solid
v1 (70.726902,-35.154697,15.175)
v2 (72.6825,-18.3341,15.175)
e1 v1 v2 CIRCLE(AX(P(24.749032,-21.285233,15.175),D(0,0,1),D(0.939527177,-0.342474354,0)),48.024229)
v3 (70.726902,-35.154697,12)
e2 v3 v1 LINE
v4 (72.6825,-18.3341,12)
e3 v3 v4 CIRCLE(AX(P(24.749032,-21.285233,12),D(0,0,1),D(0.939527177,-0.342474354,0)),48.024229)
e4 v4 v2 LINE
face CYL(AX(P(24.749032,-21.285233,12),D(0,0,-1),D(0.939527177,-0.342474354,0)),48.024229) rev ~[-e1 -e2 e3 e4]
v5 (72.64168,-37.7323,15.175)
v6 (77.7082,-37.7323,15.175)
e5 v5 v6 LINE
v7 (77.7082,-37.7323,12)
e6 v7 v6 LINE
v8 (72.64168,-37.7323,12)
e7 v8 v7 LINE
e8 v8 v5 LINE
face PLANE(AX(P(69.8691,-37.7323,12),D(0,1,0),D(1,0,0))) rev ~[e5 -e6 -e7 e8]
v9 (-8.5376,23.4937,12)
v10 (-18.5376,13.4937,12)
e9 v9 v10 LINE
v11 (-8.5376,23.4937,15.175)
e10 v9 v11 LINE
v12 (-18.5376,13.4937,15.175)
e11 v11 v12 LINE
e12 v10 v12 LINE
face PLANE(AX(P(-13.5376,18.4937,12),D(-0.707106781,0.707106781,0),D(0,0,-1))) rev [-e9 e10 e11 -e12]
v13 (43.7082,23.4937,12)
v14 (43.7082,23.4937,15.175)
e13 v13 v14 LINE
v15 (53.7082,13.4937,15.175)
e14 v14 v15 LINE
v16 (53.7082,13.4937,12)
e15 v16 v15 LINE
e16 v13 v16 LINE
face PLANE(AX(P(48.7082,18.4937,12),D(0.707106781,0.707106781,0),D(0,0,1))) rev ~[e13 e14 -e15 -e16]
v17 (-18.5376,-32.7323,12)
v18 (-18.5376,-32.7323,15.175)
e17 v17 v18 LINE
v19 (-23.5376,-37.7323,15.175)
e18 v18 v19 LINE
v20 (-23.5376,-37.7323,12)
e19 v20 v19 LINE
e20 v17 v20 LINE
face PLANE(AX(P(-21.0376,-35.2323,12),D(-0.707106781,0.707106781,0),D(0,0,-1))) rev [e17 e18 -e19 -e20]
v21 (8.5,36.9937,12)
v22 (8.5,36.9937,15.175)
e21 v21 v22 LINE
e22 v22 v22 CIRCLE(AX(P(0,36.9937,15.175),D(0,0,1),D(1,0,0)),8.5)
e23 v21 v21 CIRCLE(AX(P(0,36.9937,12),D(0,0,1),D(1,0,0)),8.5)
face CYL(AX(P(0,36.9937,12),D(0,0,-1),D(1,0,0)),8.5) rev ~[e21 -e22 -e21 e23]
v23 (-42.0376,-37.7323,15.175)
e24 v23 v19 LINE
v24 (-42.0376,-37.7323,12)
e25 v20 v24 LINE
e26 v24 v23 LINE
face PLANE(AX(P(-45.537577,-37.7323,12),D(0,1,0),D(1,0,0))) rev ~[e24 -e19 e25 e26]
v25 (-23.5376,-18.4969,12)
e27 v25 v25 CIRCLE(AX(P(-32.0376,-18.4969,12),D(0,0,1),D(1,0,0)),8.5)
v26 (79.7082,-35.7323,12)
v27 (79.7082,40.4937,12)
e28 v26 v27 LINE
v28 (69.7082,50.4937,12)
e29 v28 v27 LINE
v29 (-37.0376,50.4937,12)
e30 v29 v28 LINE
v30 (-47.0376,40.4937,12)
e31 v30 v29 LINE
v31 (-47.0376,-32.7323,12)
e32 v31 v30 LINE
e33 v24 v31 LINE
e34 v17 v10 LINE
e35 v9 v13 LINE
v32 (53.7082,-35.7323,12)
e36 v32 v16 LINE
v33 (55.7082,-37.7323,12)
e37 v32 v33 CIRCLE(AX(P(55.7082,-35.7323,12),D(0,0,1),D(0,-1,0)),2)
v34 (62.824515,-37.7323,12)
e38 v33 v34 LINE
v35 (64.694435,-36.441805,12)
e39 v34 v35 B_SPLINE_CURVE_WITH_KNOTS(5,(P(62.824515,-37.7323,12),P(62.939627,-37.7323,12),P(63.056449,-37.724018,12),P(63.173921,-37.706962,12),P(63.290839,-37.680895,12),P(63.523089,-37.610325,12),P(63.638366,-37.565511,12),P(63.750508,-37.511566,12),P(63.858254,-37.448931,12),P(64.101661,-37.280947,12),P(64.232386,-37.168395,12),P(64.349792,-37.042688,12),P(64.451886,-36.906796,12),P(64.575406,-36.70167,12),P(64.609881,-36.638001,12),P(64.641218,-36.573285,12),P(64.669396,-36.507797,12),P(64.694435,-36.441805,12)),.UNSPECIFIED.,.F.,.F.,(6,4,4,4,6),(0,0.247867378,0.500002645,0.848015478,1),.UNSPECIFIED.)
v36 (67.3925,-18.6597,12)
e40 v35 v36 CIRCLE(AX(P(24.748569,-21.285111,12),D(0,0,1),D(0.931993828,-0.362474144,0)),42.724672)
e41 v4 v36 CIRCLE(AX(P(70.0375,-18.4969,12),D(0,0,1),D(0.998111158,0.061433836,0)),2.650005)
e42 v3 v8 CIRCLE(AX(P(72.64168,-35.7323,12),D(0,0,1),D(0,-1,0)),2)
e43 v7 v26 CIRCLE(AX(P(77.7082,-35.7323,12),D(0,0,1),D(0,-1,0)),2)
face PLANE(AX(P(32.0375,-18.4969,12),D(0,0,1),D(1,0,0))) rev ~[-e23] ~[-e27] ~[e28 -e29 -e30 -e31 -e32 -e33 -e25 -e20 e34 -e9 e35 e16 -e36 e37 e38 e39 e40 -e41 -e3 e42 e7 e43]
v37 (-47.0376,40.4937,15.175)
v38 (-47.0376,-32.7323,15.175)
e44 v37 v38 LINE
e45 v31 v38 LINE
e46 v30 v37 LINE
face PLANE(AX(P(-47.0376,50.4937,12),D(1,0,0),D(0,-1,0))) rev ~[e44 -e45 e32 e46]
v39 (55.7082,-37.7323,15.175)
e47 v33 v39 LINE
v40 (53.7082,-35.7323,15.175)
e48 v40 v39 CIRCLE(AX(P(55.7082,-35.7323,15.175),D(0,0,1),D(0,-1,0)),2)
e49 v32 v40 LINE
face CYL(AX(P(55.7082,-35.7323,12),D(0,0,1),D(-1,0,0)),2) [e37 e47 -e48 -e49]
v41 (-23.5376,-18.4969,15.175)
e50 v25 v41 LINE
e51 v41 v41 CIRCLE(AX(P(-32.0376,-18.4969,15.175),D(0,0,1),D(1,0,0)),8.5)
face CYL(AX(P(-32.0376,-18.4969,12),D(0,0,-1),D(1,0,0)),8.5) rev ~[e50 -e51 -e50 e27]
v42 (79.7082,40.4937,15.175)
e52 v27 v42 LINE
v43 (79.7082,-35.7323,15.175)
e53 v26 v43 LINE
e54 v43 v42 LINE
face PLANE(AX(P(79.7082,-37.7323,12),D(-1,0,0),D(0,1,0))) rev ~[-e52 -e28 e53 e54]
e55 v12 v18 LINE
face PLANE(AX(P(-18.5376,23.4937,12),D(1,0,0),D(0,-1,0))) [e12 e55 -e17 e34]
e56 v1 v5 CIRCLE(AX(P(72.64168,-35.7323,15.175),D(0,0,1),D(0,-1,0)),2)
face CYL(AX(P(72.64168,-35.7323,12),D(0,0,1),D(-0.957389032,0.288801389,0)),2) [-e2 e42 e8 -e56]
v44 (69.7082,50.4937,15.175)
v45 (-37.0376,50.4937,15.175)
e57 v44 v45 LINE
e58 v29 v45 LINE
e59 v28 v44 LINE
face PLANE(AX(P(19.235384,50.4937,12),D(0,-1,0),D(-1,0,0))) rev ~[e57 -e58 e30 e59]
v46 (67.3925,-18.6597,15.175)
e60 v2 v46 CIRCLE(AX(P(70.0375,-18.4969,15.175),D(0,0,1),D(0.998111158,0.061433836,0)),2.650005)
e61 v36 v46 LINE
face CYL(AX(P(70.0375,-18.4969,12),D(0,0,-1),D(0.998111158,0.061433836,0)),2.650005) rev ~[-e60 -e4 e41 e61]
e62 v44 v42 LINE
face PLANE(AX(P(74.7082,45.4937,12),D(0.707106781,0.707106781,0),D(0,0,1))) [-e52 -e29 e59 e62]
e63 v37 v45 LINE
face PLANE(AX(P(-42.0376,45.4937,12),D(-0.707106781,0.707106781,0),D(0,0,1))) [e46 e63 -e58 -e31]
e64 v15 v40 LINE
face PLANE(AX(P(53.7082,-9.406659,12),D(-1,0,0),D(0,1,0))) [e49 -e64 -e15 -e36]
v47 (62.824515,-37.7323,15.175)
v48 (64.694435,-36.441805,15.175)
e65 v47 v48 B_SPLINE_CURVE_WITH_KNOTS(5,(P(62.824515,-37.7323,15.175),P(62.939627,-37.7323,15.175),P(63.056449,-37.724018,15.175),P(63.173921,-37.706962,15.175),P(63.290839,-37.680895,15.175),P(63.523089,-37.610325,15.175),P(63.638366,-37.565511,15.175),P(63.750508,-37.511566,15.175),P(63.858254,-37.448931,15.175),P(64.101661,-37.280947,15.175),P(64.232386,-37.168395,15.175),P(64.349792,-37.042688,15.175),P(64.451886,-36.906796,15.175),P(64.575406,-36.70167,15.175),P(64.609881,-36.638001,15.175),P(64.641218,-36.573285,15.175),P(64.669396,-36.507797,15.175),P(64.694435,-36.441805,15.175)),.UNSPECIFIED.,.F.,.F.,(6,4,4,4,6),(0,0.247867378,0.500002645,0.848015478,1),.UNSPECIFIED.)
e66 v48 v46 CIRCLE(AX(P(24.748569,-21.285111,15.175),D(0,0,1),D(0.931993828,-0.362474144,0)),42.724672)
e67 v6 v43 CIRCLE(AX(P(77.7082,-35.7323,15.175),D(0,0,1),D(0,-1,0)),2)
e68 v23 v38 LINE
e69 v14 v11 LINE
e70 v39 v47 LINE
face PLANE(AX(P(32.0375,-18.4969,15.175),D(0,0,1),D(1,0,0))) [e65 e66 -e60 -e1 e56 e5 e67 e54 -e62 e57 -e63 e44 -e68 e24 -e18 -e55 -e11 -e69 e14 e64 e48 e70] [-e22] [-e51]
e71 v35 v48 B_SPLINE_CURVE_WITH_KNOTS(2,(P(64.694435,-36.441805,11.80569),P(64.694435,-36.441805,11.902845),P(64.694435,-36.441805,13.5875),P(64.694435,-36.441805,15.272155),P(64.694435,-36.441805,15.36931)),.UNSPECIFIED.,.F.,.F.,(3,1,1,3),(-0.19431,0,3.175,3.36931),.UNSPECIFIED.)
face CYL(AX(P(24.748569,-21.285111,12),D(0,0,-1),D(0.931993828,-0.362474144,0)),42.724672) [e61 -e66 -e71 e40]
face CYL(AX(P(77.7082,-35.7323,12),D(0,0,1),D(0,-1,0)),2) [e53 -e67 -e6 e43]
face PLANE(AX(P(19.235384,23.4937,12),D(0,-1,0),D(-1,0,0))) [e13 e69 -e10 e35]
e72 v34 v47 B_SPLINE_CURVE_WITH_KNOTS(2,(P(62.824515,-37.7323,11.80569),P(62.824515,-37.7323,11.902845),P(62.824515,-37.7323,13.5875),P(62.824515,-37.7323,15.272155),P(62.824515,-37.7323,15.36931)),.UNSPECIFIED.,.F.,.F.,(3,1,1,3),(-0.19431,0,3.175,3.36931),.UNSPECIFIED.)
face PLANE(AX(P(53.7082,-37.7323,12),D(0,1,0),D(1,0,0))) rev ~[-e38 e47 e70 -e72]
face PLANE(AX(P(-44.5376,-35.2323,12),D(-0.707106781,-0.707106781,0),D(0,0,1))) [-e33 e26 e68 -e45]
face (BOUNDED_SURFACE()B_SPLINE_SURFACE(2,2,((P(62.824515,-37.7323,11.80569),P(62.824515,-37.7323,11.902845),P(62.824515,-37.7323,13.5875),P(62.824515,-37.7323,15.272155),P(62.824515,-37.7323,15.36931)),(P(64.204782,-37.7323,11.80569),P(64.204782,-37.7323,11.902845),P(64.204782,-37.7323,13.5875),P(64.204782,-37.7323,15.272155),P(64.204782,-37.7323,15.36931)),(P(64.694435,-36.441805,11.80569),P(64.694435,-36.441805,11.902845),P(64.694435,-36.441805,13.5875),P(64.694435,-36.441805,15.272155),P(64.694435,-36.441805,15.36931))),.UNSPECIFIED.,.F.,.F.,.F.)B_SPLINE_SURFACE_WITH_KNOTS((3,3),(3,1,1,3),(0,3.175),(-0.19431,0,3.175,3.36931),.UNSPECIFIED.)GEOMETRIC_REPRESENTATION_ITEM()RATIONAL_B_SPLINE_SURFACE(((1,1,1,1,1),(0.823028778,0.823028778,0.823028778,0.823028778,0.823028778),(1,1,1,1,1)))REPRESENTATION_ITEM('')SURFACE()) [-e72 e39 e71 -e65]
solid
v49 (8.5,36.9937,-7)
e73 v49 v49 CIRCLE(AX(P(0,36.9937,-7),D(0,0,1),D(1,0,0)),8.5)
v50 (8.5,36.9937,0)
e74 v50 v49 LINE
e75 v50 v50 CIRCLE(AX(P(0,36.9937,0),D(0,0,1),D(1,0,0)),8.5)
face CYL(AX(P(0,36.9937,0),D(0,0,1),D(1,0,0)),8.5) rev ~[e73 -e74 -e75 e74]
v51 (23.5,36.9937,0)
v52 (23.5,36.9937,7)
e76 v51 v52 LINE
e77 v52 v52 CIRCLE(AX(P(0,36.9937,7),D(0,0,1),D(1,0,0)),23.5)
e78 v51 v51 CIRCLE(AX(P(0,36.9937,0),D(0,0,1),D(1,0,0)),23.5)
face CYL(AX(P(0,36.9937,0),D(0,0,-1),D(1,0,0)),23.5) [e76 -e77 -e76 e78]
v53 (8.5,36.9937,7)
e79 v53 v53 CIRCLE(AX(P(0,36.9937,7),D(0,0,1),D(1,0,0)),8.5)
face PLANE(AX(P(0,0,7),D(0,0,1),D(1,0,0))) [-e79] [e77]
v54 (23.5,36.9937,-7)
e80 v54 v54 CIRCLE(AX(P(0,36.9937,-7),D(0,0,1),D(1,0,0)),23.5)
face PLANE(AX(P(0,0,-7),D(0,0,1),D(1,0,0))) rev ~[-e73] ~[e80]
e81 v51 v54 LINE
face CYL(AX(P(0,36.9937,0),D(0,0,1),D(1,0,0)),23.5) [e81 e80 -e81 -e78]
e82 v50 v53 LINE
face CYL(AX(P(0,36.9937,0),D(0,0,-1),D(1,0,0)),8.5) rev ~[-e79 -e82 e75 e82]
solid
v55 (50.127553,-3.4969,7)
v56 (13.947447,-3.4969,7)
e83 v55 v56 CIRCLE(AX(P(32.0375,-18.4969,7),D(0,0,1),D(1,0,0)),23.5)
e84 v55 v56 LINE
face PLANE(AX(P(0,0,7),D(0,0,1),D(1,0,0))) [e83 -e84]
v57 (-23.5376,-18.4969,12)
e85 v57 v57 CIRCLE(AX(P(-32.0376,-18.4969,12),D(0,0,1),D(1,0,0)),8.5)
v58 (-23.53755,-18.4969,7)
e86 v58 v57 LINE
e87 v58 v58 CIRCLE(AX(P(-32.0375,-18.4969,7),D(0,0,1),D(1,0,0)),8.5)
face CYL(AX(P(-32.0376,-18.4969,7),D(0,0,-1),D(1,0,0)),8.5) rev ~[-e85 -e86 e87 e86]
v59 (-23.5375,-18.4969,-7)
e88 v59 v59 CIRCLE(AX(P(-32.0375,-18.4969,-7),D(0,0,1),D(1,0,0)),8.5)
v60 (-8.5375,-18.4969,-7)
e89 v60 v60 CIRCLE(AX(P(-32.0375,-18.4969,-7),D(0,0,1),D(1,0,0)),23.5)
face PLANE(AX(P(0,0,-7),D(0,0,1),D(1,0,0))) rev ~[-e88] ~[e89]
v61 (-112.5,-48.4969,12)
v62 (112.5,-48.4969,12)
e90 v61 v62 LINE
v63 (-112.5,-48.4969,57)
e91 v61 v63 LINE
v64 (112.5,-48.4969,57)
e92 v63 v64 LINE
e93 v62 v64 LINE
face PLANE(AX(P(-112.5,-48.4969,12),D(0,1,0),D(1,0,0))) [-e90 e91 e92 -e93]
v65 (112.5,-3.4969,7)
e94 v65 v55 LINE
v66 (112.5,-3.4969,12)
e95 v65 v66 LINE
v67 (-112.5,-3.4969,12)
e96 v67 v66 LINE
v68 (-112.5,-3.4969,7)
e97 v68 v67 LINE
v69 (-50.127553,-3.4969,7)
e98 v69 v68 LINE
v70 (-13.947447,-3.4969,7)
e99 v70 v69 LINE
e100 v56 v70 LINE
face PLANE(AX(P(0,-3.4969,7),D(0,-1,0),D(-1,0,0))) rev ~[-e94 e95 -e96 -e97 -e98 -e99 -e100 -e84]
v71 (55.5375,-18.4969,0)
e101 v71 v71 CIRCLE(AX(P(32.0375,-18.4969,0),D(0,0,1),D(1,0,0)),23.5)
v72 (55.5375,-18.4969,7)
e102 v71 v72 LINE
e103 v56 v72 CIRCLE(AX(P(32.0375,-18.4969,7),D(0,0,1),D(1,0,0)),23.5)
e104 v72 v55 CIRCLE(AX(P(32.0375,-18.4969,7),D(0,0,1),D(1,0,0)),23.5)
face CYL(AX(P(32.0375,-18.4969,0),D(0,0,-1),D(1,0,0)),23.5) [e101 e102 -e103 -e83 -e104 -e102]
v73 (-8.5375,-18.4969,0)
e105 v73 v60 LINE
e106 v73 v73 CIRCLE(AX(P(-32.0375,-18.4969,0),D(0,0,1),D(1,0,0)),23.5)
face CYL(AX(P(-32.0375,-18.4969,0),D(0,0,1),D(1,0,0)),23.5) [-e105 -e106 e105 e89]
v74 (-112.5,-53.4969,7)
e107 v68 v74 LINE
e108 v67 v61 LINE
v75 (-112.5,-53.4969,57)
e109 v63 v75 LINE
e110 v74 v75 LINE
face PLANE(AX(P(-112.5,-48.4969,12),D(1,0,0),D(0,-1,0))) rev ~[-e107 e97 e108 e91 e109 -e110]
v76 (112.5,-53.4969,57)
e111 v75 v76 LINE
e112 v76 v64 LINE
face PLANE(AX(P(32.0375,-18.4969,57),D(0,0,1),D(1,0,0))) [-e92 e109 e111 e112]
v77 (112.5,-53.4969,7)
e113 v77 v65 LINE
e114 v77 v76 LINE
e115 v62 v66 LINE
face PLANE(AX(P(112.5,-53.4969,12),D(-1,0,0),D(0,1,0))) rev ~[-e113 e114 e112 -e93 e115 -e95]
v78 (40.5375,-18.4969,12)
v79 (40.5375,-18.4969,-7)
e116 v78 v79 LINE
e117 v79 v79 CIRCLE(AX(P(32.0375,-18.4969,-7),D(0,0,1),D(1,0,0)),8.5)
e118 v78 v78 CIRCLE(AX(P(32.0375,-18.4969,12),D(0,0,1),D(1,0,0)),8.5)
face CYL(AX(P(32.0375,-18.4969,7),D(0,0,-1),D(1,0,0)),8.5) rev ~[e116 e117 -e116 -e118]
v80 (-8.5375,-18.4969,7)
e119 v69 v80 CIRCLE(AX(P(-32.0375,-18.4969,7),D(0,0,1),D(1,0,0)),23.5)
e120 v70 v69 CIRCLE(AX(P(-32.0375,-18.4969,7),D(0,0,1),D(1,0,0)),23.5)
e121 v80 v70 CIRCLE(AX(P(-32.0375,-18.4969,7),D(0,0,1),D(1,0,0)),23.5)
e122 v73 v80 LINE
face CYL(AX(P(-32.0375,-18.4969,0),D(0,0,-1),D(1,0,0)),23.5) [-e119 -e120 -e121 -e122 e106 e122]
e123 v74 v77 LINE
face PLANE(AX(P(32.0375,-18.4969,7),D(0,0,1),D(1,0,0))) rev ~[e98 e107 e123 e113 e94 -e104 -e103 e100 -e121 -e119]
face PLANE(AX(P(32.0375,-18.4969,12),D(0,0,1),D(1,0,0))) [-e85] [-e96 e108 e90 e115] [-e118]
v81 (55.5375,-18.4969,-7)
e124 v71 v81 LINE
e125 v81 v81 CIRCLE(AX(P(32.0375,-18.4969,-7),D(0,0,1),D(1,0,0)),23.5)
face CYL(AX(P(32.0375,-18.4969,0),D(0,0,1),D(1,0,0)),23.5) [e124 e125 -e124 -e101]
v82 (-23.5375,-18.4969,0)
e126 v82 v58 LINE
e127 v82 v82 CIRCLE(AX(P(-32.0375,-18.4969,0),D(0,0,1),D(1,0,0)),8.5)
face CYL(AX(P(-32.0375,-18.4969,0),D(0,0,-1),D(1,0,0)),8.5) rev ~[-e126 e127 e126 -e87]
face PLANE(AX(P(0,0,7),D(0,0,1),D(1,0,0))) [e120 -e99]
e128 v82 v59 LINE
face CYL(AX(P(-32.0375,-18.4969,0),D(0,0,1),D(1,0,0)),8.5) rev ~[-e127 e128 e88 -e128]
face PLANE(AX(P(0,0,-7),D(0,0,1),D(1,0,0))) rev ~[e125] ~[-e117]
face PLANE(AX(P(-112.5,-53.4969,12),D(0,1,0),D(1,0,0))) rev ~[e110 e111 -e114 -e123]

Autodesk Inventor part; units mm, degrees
sketch "Sketch1" plane through (0, 0, 0) normal (0, 0, 1) x (1, 0, 0)
  circle A0 centre (0, 0) radius 13.4938 construction
  circle A1 centre (0, 36.9937) radius 8.5
  circle A2 centre (0, 36.9937) radius 23.5
  circle A3 centre (-32.0375, -18.4969) radius 23.5
  circle A4 centre (-32.0375, -18.4969) radius 8.5
  circle A5 centre (32.0375, -18.4969) radius 23.5
  circle A6 centre (32.0375, -18.4969) radius 8.5
  dimension "d0" = 26.9875
  dimension "d1" = 17
  dimension "d2" = 47
  dimension "d5" = 360
  dimension "d25" = 64.0751
extrude "Extrusion1" add sketch "Sketch1" along normal mid plane 14
sketch "Sketch4" plane through (32.0375, -18.4969, 7) normal (0, 0, 1) x (1, 0, 0)
  line L0 (-144.5375, -35) -> (80.4625, -35)
  line L1 (80.4625, -35) -> (80.4625, 15)
  line L2 (80.4625, 15) -> (-144.5375, 15)
  line L3 (-144.5375, 15) -> (-144.5375, -35)
  line L4 (-144.5375, -35) -> (80.4625, 15) construction
  line L5 (80.4625, -35) -> (-144.5375, 15) construction
  line L6 (-32.0375, 101.7888) -> (-32.0375, -57.7981) projected
  circle A0 centre (0, 0) radius 8.5 projected
  circle A1 centre (-64.0751, 0) radius 8.5 projected
  point P0 (-32.0375, 18.4969)
  point P1 (-32.0375, -10)
  dimension "d16" = 50
  dimension "d17" = 225
  dimension "d18" = 0
  dimension "d19" = 15
extrude "Extrusion3" add sketch "Sketch4" along normal blind 5
sketch "Sketch5" plane through (32.0375, -18.4969, 12) normal (0, 0, 1) x (1, 0, 0)
  line L0 (-144.5375, -35) -> (80.4625, -35) projected
  line L1 (-144.5375, 15) -> (-144.5375, -35) projected
  line L2 (80.4625, -35) -> (80.4625, 15) projected
  line L3 (-144.5375, -30) -> (80.4625, -30)
  point P0 (-32.0375, 18.4969)
  dimension "d22" = 5
extrude "Extrusion4" add sketch "Sketch5" along normal blind 45
sketch "Sketch6" plane through (32.0375, -18.4969, 12) normal (0, 0, 1) x (1, 0, 0)
  circle A0 centre (-32.0375, 18.4969) radius 13.4938 construction
  circle A1 centre (-32.0375, 55.4906) radius 23.5 projected
  circle A2 centre (-32.0375, 55.4906) radius 8.5 projected
  circle A3 centre (-64.0751, 0) radius 8.5 projected
  circle A4 centre (-64.0751, 0) radius 8.5 projected
  line L0 (47.6707, -19.2354) -> (47.6707, 68.9906)
  line L1 (47.6707, 68.9906) -> (-79.0751, 68.9906)
  line L2 (-79.0751, 68.9906) -> (-79.0751, -19.2354)
  circle A5 centre (-64.0751, 0) radius 23.5 projected
  line L3 (-50.5751, -19.2354) -> (21.6707, -19.2354)
  line L4 (21.6707, -19.2354) -> (21.6707, 41.9906)
  line L5 (21.6707, 41.9906) -> (-50.5751, 41.9906)
  line L6 (-50.5751, 41.9906) -> (-50.5751, -19.2354)
  arc A6 (18.0901, 15) -> (-18.0901, 15) centre (0, 0) ccw projected
  arc A7 (-18.0901, 15) -> (18.0901, 15) centre (0, 0) ccw projected
  arc A8 (35, -19.2354) -> (37.509, -10) centre (-7.2886, -2.7883) ccw construction
  arc A9 (37.8316, -19.2354) -> (40.645, 0.1628) centre (-7.2886, -2.7883) ccw
  arc A10 (32.5302, -18.2748) -> (35.355, -0.1628) centre (-7.2886, -2.7883) ccw
  arc A11 (40.645, 0.1628) -> (35.355, -0.1628) centre (38, 0) ccw
  arc A12 (32.5302, -18.2748) -> (32.35, -19.2354) centre (35, -19.2354) ccw
  line L7 (-79.0751, -19.2354) -> (32.35, -19.2354)
  line L8 (37.8316, -19.2354) -> (47.6707, -19.2354)
  dimension "d26" = 5
  dimension "d27" = 13.5
  dimension "d28" = 15
  dimension "d30" = 13.5
  dimension "d32" = 28.5
  dimension "d33" = 26
extrude "Extrusion5" add sketch "Sketch6" along normal blind 3.175 separate body contours A1 L5 L6 L1 | A1 L1 L0 L8 A9 A11 A10 A12 L7 L4 A7 L5 | A1 L6 A5 L2 L1 | L6 L7 A5 L2 | A7 L4 | A5 L7 L2
chamfer "Chamfer1" distance 10 angle 45 1 edges at (-18.5375, 23.4938, 13.5875)
chamfer "Chamfer2" distance 10 angle 45 3 edges at (-47.0375, 50.4937, 13.5875) (79.7082, 50.4938, 13.5875) (53.7082, 23.4938, 13.5875)
fillet "Fillet1" radius 2 4 edges at (53.7082, -37.7323, 13.5875) (64.3875, -37.7323, 13.5875) (79.7082, -37.7323, 13.5875) (69.8691, -37.7323, 13.5875)
chamfer "Chamfer3" distance 5 angle 45 2 edges at (-47.0375, -37.7323, 13.5875) (-18.5375, -37.7323, 13.5875)
